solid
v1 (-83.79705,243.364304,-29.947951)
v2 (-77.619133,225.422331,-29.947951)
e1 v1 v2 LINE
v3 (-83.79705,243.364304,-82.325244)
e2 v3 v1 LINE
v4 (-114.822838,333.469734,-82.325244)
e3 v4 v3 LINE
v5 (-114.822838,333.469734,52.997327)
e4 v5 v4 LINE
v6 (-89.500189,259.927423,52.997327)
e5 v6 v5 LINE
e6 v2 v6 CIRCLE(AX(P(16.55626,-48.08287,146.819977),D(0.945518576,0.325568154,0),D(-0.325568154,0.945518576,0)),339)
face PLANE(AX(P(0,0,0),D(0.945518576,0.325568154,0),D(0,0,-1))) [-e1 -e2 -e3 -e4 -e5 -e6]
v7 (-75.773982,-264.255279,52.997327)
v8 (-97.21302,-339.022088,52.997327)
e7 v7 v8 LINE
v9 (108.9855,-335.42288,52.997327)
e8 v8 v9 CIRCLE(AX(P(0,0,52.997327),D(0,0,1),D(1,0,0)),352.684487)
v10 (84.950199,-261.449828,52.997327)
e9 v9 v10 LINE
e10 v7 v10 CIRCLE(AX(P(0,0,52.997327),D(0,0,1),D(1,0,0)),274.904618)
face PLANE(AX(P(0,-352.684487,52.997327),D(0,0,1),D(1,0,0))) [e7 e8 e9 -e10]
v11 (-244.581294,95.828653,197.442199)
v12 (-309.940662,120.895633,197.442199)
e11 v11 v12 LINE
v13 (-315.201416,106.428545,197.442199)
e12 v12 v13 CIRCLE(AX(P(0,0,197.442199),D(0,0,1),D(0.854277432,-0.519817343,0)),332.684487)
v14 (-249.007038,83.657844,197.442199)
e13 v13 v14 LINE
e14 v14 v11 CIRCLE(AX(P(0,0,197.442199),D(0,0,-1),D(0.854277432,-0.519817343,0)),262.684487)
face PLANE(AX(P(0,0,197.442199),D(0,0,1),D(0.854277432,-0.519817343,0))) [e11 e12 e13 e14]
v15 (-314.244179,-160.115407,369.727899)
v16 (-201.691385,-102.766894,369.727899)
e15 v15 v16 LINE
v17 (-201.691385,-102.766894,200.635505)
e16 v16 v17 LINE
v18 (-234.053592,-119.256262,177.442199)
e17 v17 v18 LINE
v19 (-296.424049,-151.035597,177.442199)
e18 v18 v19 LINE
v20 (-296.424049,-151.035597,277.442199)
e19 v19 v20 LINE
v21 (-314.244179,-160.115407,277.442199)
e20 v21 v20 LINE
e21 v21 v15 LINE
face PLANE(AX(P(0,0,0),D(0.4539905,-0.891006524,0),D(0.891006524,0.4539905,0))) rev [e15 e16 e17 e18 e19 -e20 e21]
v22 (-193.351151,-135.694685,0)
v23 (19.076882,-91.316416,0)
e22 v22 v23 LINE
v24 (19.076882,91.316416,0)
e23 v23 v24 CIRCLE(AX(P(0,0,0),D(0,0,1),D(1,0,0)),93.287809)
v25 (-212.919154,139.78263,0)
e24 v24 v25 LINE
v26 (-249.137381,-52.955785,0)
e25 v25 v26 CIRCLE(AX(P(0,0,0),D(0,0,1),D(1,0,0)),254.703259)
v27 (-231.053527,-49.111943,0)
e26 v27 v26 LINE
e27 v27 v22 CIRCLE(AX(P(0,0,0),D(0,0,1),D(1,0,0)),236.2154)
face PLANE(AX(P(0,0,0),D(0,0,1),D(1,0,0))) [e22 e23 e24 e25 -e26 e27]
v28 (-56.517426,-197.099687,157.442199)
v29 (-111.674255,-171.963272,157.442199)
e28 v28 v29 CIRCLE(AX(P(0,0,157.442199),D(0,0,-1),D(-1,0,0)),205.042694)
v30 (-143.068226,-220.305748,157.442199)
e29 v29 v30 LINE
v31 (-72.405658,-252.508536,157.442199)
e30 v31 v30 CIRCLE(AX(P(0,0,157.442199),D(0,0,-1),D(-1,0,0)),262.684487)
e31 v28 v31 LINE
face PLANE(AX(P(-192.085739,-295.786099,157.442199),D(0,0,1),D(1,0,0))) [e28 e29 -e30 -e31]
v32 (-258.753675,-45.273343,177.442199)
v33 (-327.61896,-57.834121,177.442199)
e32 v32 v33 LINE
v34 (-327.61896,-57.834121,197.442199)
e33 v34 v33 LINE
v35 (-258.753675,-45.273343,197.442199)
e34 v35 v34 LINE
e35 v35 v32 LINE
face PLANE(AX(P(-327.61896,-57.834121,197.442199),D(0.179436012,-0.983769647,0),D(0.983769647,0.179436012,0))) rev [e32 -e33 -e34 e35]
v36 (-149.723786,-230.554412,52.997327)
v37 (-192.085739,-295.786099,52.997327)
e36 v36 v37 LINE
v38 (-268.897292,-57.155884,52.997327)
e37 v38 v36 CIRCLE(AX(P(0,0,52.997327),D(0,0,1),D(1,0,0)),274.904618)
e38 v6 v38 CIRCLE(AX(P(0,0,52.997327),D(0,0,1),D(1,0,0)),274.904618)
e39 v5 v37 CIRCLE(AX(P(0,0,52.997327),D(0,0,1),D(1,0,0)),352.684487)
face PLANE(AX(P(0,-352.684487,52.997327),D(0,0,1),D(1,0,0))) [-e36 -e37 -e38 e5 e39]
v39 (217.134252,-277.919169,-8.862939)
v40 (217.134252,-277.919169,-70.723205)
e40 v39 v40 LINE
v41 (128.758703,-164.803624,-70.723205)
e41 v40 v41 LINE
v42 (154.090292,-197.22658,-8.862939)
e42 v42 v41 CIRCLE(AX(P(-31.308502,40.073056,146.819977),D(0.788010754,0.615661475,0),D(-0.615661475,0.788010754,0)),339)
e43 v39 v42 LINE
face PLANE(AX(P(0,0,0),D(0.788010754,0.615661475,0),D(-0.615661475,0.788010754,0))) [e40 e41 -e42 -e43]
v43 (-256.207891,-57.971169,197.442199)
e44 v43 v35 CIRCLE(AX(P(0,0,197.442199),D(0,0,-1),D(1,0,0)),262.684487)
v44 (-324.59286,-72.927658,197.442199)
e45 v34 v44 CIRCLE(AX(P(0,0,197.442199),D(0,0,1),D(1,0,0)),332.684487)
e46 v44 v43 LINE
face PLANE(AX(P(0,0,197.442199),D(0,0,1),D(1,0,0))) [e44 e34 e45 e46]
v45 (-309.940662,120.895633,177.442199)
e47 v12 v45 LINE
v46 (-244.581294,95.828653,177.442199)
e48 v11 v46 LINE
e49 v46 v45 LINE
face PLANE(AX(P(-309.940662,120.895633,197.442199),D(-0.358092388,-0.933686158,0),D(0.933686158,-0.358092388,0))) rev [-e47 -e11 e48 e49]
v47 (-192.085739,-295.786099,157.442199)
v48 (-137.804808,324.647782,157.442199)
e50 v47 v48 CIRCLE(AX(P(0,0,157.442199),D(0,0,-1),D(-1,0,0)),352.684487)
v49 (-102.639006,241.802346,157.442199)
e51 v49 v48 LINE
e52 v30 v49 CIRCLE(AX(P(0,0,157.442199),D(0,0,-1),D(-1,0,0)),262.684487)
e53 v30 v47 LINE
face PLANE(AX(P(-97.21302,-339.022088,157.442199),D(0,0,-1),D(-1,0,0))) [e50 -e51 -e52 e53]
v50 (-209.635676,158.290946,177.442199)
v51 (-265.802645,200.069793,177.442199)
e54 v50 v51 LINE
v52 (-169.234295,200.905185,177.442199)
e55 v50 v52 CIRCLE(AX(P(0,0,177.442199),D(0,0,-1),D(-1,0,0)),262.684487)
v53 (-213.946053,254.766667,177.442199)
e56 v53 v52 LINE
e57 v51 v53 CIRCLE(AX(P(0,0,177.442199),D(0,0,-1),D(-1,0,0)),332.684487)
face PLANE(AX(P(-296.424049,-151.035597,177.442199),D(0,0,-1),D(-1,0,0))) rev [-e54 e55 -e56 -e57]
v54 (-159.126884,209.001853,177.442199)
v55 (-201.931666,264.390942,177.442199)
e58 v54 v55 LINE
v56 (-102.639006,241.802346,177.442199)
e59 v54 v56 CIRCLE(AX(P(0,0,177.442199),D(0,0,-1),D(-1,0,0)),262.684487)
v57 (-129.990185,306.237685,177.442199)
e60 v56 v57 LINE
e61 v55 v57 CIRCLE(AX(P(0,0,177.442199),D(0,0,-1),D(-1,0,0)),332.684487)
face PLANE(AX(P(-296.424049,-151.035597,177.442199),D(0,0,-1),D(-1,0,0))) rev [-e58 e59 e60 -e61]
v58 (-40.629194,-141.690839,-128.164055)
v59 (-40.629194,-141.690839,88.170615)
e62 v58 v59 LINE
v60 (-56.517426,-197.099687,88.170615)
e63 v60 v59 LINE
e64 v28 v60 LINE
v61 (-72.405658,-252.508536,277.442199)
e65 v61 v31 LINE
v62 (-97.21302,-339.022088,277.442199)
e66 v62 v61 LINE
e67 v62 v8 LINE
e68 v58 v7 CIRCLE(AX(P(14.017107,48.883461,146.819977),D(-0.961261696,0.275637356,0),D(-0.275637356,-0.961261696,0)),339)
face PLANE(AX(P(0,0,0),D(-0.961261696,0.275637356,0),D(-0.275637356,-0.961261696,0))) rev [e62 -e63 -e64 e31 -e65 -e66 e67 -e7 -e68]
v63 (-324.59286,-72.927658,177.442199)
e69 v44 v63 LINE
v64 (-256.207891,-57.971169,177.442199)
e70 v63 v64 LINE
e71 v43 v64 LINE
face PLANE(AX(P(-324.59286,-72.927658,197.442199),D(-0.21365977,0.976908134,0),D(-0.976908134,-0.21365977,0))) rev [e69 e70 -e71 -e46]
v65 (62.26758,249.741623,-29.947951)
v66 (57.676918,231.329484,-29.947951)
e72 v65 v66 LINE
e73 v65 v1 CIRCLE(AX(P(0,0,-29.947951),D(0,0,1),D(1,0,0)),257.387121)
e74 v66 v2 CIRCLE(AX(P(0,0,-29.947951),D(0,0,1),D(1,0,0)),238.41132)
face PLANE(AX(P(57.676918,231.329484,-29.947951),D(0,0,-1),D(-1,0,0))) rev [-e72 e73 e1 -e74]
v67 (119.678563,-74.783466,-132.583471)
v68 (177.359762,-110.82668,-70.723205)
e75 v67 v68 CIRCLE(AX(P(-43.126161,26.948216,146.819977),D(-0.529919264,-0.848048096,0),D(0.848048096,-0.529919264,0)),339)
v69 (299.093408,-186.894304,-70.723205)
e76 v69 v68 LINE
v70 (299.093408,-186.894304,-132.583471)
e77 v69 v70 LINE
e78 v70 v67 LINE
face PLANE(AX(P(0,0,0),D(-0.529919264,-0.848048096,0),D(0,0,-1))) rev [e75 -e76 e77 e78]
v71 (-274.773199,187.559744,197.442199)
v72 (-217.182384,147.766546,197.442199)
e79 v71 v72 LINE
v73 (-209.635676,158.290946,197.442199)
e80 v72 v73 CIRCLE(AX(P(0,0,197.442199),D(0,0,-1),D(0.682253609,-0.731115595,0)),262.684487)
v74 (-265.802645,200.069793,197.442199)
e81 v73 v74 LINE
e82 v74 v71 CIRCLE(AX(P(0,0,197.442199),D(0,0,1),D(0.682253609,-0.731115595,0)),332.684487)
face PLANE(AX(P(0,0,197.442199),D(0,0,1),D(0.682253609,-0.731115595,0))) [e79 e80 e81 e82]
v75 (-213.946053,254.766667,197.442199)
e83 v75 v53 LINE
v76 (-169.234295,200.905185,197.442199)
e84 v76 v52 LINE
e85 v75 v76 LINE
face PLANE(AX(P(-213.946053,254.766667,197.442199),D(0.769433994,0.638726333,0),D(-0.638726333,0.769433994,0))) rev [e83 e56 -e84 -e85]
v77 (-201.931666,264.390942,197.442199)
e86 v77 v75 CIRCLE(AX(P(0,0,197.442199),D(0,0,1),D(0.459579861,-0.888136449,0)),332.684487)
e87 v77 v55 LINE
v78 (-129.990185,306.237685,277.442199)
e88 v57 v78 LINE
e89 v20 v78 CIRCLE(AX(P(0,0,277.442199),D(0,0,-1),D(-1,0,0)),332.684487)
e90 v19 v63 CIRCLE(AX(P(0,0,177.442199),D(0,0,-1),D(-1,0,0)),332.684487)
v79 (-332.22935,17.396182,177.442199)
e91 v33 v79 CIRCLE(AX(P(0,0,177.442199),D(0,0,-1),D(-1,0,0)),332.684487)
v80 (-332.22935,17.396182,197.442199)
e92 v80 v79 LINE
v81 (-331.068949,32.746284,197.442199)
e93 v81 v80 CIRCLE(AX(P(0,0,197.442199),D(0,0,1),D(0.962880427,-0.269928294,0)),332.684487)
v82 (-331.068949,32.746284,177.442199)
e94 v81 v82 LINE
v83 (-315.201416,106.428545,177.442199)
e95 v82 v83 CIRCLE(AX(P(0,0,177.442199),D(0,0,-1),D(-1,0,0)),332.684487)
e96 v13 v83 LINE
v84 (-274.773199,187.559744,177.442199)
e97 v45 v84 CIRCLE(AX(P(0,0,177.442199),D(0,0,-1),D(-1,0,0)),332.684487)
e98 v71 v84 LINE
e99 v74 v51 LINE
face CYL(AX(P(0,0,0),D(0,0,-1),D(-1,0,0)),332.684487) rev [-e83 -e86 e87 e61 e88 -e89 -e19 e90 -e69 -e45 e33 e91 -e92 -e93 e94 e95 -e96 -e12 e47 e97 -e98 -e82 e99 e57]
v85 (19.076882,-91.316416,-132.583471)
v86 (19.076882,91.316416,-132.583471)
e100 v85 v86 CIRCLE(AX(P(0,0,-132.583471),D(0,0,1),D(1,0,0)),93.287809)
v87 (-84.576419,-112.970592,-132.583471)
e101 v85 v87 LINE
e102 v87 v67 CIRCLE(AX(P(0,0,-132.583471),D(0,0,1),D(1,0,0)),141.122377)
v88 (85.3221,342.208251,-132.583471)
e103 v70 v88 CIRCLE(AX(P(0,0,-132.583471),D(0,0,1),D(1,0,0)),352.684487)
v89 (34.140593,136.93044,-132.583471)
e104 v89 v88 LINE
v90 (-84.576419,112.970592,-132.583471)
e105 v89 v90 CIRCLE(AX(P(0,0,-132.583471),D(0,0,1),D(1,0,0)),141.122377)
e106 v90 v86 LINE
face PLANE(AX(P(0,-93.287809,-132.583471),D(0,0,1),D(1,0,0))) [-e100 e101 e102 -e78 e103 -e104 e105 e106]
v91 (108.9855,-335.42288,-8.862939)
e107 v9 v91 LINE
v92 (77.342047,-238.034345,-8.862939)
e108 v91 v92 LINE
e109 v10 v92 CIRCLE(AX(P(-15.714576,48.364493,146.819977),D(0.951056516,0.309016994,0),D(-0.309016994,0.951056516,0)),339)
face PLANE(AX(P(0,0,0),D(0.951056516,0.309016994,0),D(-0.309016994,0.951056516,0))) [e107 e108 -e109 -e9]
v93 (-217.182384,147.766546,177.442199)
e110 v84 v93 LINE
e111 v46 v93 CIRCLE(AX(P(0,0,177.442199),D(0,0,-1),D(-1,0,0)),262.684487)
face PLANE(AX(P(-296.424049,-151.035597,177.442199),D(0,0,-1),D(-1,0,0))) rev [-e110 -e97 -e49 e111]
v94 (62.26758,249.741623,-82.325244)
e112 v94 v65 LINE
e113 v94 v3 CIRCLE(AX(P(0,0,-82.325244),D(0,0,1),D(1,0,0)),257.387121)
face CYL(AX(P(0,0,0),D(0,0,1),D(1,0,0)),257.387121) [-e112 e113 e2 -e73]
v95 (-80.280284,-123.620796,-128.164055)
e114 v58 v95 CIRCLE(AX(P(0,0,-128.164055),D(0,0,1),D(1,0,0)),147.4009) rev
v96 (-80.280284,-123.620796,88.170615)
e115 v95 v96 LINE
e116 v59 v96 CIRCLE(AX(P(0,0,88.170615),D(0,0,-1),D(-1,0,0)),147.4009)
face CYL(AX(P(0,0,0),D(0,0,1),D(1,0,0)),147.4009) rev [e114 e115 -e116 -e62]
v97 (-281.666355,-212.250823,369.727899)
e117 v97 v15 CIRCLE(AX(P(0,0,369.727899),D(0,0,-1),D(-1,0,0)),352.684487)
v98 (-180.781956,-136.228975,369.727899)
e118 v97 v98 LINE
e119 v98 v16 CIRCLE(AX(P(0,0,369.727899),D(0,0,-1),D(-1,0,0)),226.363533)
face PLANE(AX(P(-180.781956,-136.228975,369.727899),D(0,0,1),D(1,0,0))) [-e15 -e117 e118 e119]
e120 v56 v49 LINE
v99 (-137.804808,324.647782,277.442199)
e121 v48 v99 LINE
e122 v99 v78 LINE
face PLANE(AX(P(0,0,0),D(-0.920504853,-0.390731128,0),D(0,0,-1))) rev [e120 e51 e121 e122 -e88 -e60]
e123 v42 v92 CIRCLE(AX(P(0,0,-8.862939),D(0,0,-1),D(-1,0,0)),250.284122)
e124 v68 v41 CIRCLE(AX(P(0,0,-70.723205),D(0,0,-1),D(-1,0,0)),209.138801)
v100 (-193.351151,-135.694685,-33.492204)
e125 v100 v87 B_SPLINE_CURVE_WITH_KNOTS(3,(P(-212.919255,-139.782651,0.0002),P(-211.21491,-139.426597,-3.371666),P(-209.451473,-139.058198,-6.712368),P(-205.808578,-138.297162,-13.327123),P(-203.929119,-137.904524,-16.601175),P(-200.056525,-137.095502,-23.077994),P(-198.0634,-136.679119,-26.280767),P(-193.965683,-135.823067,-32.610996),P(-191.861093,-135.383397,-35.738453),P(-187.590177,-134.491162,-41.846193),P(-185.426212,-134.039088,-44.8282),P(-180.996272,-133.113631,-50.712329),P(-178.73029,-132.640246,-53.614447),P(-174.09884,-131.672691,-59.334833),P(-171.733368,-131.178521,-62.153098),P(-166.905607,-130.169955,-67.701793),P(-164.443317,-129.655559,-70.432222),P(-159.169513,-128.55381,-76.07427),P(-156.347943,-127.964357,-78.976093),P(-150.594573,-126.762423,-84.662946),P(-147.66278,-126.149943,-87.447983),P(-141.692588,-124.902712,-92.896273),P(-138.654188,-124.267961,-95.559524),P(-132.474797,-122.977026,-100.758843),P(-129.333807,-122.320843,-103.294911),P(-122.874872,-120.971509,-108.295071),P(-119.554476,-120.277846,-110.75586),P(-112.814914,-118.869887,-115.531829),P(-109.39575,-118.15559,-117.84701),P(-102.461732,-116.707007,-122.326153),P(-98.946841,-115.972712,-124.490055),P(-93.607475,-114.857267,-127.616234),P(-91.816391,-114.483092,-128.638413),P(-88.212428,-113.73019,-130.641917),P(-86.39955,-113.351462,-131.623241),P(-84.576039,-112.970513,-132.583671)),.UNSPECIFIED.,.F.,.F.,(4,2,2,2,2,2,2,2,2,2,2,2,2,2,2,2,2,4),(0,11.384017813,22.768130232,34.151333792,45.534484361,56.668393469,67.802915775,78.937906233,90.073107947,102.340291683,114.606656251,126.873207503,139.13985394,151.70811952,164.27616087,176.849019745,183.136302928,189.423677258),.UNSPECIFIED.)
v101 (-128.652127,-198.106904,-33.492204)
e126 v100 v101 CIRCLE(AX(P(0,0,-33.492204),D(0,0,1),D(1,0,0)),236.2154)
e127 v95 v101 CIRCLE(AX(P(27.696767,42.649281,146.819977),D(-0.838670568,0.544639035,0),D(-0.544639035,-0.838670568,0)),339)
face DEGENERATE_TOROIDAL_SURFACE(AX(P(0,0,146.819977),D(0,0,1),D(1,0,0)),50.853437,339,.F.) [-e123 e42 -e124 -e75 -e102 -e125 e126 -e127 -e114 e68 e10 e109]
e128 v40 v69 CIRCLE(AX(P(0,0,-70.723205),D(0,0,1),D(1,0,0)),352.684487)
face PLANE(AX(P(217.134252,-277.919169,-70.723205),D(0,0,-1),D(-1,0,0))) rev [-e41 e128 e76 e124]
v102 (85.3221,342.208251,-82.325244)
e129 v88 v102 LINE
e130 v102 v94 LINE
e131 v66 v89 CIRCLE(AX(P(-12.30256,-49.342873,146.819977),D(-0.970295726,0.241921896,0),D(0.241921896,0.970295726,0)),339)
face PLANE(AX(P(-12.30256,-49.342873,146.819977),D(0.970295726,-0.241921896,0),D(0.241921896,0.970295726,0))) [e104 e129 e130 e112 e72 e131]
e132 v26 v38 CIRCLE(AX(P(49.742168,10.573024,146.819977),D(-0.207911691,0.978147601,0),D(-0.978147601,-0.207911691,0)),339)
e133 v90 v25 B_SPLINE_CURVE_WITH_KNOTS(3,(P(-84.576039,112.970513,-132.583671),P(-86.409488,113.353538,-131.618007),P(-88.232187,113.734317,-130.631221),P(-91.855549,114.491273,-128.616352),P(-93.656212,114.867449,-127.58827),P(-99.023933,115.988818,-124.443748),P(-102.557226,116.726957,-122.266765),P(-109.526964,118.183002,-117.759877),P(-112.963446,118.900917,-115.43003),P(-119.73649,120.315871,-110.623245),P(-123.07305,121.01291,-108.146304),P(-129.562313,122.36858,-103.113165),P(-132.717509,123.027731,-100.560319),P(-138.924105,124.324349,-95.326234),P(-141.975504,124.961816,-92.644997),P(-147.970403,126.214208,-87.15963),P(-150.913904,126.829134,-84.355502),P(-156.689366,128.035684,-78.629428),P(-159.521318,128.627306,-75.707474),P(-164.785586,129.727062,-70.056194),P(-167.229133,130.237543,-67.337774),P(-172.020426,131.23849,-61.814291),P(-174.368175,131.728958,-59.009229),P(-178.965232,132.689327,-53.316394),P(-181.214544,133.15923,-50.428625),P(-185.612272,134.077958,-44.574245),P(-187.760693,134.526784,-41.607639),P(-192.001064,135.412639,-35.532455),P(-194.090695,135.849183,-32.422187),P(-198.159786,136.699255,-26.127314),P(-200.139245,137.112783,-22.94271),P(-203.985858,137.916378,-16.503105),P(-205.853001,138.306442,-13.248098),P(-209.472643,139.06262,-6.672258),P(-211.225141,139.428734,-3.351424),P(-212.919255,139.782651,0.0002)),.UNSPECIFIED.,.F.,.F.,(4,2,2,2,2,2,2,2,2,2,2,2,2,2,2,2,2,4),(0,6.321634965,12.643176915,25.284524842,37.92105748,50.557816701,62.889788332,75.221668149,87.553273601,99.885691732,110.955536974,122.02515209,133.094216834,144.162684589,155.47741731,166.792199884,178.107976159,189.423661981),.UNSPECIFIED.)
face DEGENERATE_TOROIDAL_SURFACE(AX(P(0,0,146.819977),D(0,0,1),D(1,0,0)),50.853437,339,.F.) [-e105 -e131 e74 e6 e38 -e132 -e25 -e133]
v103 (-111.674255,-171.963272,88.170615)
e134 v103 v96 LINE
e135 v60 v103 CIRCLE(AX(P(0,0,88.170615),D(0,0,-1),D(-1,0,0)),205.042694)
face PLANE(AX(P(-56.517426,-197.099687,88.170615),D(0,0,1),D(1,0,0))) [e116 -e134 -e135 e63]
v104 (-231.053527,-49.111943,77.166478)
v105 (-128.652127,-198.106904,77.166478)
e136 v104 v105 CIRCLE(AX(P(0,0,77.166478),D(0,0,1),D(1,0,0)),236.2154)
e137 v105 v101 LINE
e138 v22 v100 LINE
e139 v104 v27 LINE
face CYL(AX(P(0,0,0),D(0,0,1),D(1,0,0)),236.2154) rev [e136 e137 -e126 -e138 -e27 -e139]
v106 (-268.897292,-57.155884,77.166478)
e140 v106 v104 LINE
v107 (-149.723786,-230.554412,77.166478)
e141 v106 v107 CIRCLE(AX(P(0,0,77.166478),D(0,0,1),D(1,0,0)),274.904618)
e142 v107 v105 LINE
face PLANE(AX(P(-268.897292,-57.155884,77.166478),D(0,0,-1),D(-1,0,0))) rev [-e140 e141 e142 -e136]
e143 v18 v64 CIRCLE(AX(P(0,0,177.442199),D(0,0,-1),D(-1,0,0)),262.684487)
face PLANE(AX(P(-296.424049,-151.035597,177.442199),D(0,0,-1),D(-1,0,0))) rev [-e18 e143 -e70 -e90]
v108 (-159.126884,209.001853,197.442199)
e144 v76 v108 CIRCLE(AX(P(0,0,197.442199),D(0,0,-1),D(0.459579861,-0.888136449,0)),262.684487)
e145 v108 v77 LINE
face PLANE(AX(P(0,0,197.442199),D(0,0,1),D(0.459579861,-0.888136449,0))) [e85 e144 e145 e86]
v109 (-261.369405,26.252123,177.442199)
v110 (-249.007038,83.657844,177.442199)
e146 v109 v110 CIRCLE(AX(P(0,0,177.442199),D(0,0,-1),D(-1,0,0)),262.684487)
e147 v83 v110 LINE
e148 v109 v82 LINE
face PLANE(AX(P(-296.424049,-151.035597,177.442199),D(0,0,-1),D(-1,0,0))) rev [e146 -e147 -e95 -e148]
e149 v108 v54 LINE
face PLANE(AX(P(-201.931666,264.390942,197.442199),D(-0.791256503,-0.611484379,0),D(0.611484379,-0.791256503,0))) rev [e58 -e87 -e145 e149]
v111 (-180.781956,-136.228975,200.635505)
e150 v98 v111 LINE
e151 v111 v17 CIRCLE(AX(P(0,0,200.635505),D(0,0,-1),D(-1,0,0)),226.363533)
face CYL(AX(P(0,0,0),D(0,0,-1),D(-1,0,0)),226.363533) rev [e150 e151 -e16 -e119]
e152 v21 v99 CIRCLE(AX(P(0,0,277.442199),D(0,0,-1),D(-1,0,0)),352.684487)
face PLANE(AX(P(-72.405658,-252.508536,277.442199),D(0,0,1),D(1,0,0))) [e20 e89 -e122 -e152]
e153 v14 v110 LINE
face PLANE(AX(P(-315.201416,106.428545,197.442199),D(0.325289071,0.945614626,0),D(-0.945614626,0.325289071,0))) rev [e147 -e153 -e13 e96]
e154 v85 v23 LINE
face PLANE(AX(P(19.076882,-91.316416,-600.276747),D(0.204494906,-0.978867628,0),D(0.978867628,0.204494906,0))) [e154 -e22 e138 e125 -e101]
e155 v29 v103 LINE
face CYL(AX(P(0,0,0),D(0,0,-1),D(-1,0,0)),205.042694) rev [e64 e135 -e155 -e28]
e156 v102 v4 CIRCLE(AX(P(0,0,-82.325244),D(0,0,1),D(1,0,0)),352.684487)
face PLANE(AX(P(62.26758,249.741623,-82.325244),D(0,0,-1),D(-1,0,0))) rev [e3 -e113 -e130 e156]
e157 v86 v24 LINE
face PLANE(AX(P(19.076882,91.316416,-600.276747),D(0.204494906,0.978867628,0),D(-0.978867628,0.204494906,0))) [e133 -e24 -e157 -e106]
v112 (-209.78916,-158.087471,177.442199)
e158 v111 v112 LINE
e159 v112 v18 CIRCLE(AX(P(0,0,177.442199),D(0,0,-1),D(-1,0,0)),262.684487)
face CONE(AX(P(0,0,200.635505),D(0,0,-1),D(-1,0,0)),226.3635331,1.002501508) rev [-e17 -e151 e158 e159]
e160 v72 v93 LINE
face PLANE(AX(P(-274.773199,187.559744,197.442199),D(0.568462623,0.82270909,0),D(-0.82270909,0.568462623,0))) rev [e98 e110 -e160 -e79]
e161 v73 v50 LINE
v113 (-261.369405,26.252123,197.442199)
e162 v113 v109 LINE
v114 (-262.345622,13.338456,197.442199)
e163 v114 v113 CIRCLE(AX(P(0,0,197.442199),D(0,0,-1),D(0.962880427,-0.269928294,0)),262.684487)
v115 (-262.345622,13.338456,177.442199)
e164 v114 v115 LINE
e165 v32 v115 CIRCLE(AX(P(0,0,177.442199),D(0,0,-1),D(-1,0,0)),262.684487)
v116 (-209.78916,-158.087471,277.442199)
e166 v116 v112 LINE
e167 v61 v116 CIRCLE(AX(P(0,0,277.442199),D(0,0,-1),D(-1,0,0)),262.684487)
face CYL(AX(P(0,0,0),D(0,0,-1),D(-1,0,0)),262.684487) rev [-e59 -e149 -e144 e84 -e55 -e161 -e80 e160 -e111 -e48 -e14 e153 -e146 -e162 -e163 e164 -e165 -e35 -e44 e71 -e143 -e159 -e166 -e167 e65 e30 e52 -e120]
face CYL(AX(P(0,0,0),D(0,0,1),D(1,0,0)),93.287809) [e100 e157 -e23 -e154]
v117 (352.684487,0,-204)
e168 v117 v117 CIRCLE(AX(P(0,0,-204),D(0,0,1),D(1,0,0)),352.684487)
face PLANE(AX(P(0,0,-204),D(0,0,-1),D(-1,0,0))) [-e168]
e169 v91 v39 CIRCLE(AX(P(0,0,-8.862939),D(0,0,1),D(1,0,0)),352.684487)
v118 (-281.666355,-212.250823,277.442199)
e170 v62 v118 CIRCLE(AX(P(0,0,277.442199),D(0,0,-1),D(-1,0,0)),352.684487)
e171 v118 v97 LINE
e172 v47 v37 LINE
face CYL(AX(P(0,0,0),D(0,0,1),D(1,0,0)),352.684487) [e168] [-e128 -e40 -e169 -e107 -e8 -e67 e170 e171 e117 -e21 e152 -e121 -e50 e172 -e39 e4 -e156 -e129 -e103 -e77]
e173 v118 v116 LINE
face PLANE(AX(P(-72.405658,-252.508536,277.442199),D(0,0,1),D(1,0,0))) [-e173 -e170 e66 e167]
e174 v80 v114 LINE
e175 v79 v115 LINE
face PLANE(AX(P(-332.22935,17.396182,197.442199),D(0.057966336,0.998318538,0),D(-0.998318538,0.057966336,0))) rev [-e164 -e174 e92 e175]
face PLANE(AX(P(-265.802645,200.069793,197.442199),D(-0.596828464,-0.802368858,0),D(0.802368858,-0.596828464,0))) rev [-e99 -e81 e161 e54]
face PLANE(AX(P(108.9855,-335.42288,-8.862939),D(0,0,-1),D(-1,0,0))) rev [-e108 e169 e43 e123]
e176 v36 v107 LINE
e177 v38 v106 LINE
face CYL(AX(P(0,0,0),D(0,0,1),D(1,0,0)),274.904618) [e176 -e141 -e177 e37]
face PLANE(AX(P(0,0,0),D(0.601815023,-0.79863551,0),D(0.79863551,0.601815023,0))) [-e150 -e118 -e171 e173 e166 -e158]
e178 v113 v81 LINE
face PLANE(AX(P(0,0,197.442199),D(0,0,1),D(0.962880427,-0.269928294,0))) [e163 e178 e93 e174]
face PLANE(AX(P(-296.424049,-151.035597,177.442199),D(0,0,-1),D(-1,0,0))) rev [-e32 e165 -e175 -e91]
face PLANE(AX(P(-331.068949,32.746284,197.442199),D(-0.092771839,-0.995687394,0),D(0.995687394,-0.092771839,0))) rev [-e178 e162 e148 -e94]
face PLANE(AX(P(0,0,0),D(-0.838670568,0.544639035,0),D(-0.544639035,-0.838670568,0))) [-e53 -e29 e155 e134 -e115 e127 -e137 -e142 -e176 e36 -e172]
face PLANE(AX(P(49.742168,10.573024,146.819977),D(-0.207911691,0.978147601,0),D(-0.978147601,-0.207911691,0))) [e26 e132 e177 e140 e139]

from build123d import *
from build123d.topology import SkipClean

# Parameters (mm, degrees)
BOSS_EXTRUDE1_DEPTH          = 35
SKETCH5_W                    = 110
SKETCH5_H                    = 110
BOSS_EXTRUDE2_DEPTH          = 55
BOSS_EXTRUDE3_DEPTH          = 10
FILLET1_R                    = 20
FILLET4_R                    = 10
SKETCH12_W                   = 221.575141924
SKETCH12_H                   = 185.580798287
CUT_REVOLVE1_ANGLE           = 32
CUT_REVOLVE1_OTHER_WAY_ANGLE = 109
BOSS_EXTRUDE4_REACH          = 690.076
SKETCH15_W                   = 208.026220801
SKETCH15_H                   = 123.720532191
CUT_REVOLVE2_ANGLE           = 20
SKETCH16_W                   = 103.379457842
SKETCH16_H                   = 185.232234629
CUT_REVOLVE3_ANGLE           = 20
SKETCH17_W                   = 90
SKETCH17_H                   = 120
REVOLVE3_ANGLE               = 74
REVOLVE3_OTHER_WAY_ANGLE     = 67
SKETCH18_W                   = 70
SKETCH18_H                   = 100
CUT_REVOLVE4_ANGLE           = 94
SKETCH19_W                   = 306.456266988
SKETCH19_H                   = 205.283587683
REVOLVE4_ANGLE               = 17
SKETCH20_W                   = 69.271583649
SKETCH20_H                   = 57.641793842
REVOLVE5_ANGLE               = 10
REVOLVE6_ANGLE               = 45
REVOLVE7_ANGLE               = 33
BOSS_EXTRUDE5_DEPTH          = 20
CIRPATTERN1_COUNT            = 5
CIRPATTERN1_ANGLE            = 62.64


with BuildPart() as part:
    # Sketch4 → Boss-Extrude1 (new body)
    with BuildSketch(Plane.XY.offset(90)):
        with BuildLine():
            ThreePointArc((18, 0), (12.727922061, 12.727922061), (0, 18))
            Line((0, 18), (-40, 18))
            Line((-40, 18), (-40, 0))
            Line((-40, 0), (-5, 0))
            ThreePointArc((-5, 0), (0, 5), (5, 0))
            Line((5, 0), (18, 0))
        make_face()
        with BuildLine():
            ThreePointArc((0, -18), (12.727922061, -12.727922061), (18, 0))
            Line((18, 0), (5, 0))
            ThreePointArc((5, 0), (0, -5), (-5, 0))
            Line((-5, 0), (-40, 0))
            Line((-40, 0), (-40, -18))
            Line((-40, -18), (0, -18))
        make_face()
    extrude(amount=-BOSS_EXTRUDE1_DEPTH)

    # Sketch5 → Boss-Extrude2 (add)
    with BuildSketch(Plane(origin=(0, 0, 55), x_dir=(-1, 0, 0), z_dir=(0, 0, -1))):
        with Locations((22, 0)):
            Rectangle(SKETCH5_W, SKETCH5_H)
    extrude(amount=BOSS_EXTRUDE2_DEPTH)

    # Sketch7 → Boss-Extrude3 (add)
    with BuildSketch(Plane(origin=(0, 0, 0), x_dir=(-1, 0, 0), z_dir=(0, 0, -1))):
        Polygon((87, -65), (125, -79.925557452), (125, 79.925557452), (87, 65), (-43, 65), (-43, -65), align=None)
    extrude(amount=-BOSS_EXTRUDE3_DEPTH)

    # Fillet1
    fillet1_edges = [part.edges().sort_by_distance(p)[0] for p in [
        (-125, -79.925557452, 5),
        (-87, -65, 5),
        (43, -65, 5),
        (43, 65, 5),
        (-87, 65, 5),
        (-125, 79.925557452, 5),
    ]]
    fillet(fillet1_edges, radius=FILLET1_R)

    # Fillet4
    fillet4_edges = [part.edges().sort_by_distance(p)[0] for p in [
        (-40, -18, 72.5),
        (-40, 18, 72.5),
        (33, 0, 55),
        (-22, -55, 55),
        (-77, 0, 55),
        (-22, 55, 55),
        (33, -55, 32.5),
        (33, 55, 32.5),
        (33, 0, 10),
        (-77, -55, 32.5),
        (-77, 55, 32.5),
        (-77, 0, 10),
        (-22, 55, 10),
        (-22, -55, 10),
    ]]
    fillet(fillet4_edges, radius=FILLET4_R - 0.0001)  # a hair under: the kernel refuses the full size


with BuildPart() as body_2:
    # Sketch8 → Revolve1 (revolve)
    with BuildSketch(Plane(origin=(0, 0, 0), x_dir=(1, 0, 0), z_dir=(0, 1, 0))):
        with BuildLine():
            Line((0, -474), (0, 204))
            ThreePointArc((0, 204), (339, -135), (0, -474))
        make_face()
    revolve(axis=Axis((0, 0, 474), (0, 0, -1)))


with BuildPart() as body_3:
    # Sketch9 → Revolve2 (revolve)
    with BuildSketch(Plane(origin=(0, 0, 0), x_dir=(0, 0, -1), z_dir=(1, 0, 0)), mode=Mode.PRIVATE) as revolve2_sk:
        with BuildLine():
            Line((0, 0), (0, -93.287808854))
            Line((0, -93.287808854), (132.583470884, -93.287808854))
            Line((132.583470884, -93.287808854), (132.583470884, -141.122377334))
            ThreePointArc((132.583470884, -141.122377334), (51.419403359, -224.141377396), (-52.997327403, -274.904617695))
            Line((-52.997327403, -274.904617695), (-52.997327403, -352.684487381))
            Line((-52.997327403, -352.684487381), (204, -352.684487381))
            Line((204, -352.684487381), (204, 0))
            Line((204, 0), (0, 0))
        make_face()
    revolve(revolve2_sk.sketch.rotate(Axis((0, 0, 0), (0, 0, -1)), 270), axis=Axis((0, 0, 0), (0, 0, -1)))

    # Sketch12 → Cut-Revolve1 (revolve, cut)
    with BuildSketch(Plane(origin=(0, 0, 0), x_dir=(1, 0, 0), z_dir=(0, 1, 0))):
        with Locations((241.896916419, 39.793071741)):
            Rectangle(SKETCH12_W, SKETCH12_H)
    revolve(axis=Axis((0, 0, 0), (0, 0, -1)), revolution_arc=CUT_REVOLVE1_ANGLE, mode=Mode.SUBTRACT)

    # Sketch12 → Cut-Revolve1 other way (revolve, cut)
    with BuildSketch(Plane(origin=(0, 0, 0), x_dir=(1, 0, 0), z_dir=(0, 1, 0))):
        with Locations((241.896916419, 39.793071741)):
            Rectangle(SKETCH12_W, SKETCH12_H)
    revolve(axis=Axis((0, 0, 0), (0, 0, 1)), revolution_arc=CUT_REVOLVE1_OTHER_WAY_ANGLE, mode=Mode.SUBTRACT)

    # Sketch14 → Boss-Extrude4 (add, up to next)
    with BuildSketch(Plane.XY, mode=Mode.PRIVATE) as boss_extrude4_sk1:
        with BuildLine():
            Line((19.076881684, -91.316416191), (-234.050666272, -144.197206796))
            ThreePointArc((-234.050666272, -144.197206796), (-274.904617695, 0), (-234.050666272, 144.197206796))
            Line((-234.050666272, 144.197206796), (19.076881684, 91.316416191))
            ThreePointArc((19.076881684, 91.316416191), (93.287808854, 0), (19.076881684, -91.316416191))
        make_face()
    boss_extrude4_tool1 = extrude(boss_extrude4_sk1.sketch, amount=-BOSS_EXTRUDE4_REACH, mode=Mode.PRIVATE) - body_3.part
    add(boss_extrude4_tool1.solids().sort_by_distance((-108.886341, 0, 0))[0])

    # Sketch15 → Cut-Revolve2 (revolve, cut)
    with BuildSketch(Plane(origin=(0, 0, 0), x_dir=(0.8480480961564173, -0.5299192642332188, 0), z_dir=(0.5299192642332188, 0.8480480961564173, 0))):
        with Locations((248.67137698, 8.862938693)):
            Rectangle(SKETCH15_W, SKETCH15_H)
    revolve(axis=Axis((0, 0, 0), (0, 0, -1)), revolution_arc=CUT_REVOLVE2_ANGLE, mode=Mode.SUBTRACT)

    # Sketch16 → Cut-Revolve3 (revolve, cut)
    with BuildSketch(Plane(origin=(0, 0, 0), x_dir=(0, 0, -1), z_dir=(0.7880107536067323, 0.6156614753256451, 0))):
        with Locations((-42.826790228, -260.068370066)):
            Rectangle(SKETCH16_W, SKETCH16_H)
    revolve(axis=Axis((0, 0, 0), (0, 0, -1)), revolution_arc=CUT_REVOLVE3_ANGLE, mode=Mode.SUBTRACT)



with BuildPart() as body_4:
    # Sketch17 → Revolve3 (revolve)
    with BuildSketch(Plane(origin=(0, 0, 0), x_dir=(1, 0, 0), z_dir=(0, 1, 0))):
        with Locations((-307.684487381, -217.442198662)):
            Rectangle(SKETCH17_W, SKETCH17_H)
    revolve(axis=Axis((0, 0, 0), (0, 0, 1)), revolution_arc=REVOLVE3_ANGLE)

    # Sketch17 → Revolve3 other way (revolve)
    with BuildSketch(Plane(origin=(0, 0, 0), x_dir=(1, 0, 0), z_dir=(0, 1, 0))):
        with Locations((-307.684487381, -217.442198662)):
            Rectangle(SKETCH17_W, SKETCH17_H)
    revolve(axis=Axis((0, 0, 0), (0, 0, -1)), revolution_arc=REVOLVE3_OTHER_WAY_ANGLE)

    # Sketch18 → Cut-Revolve4 (revolve, cut)
    with BuildSketch(Plane(origin=(0, 0, 0), x_dir=(0.3907311284892735, -0.9205048534524405, 0), z_dir=(0.9205048534524405, 0.3907311284892735, 0))):
        with Locations((-297.684487381, -227.442198662)):
            Rectangle(SKETCH18_W, SKETCH18_H)
    revolve(axis=Axis((0, 0, 0), (0, 0, 1)), revolution_arc=CUT_REVOLVE4_ANGLE, mode=Mode.SUBTRACT)


with BuildPart() as body_3_1:
    with SkipClean():  # the faces are left unmerged after this step: merging them gives an invalid solid
        add(body_3.part)

        add(body_4.part)  # Revolve4 merges body 4
        # Sketch19 → Revolve4 (revolve)
        with BuildSketch(Plane(origin=(0, 0, 0), x_dir=(0, 0, -1), z_dir=(0.9612616959383228, -0.2756373558169854, 0))):
            with Locations((-4.214065168, -250.04269354)):
                Rectangle(SKETCH19_W, SKETCH19_H)
        revolve(axis=Axis((0, 0, 0), (0, 0, -1)), revolution_arc=REVOLVE4_ANGLE)

    # Sketch20 → Cut-Revolve5 (revolve, cut)
    with SkipClean():  # the faces are left unmerged after this step: merging them gives an invalid solid
        with BuildSketch(Plane(origin=(0, 0, 0), x_dir=(0, 0, -1), z_dir=(0.9612616959383229, -0.27563735581698545, 0)), mode=Mode.PRIVATE) as cut_revolve5_sk:
            with Locations((-122.806406838, -176.221796619)):
                Rectangle(SKETCH20_W, SKETCH20_H)
        revolve(cut_revolve5_sk.sketch.rotate(Axis((0, 0, 0), (0, 0, 1)), 286), axis=Axis((0, 0, 0), (0, 0, 1)), mode=Mode.SUBTRACT)

    # Sketch21 → Revolve5 (revolve)
    with SkipClean():  # the faces are left unmerged after this step: merging them gives an invalid solid
        with BuildSketch(Plane(origin=(0, 0, 0), x_dir=(0.8910065241883608, 0.4539904997395606, 0), z_dir=(-0.4539904997395606, 0.8910065241883608, 0))):
            Polygon((-352.684487381, -177.442198662), (-262.684487381, -177.442198662), (-226.3635331, -200.635504694), (-226.3635331, -369.727899201), (-352.684487381, -369.727899201), align=None)
        revolve(axis=Axis((0, 0, 0), (0, 0, 1)), revolution_arc=REVOLVE5_ANGLE)

    # Sketch23 → Revolve6 (revolve)
    with SkipClean():  # the faces are left unmerged after this step: merging them gives an invalid solid
        with BuildSketch(Plane(origin=(0, 0, 0), x_dir=(0, 0, 1), z_dir=(-0.838670567945428, 0.5446390350150208, 0))):
            with BuildLine():
                Line((52.997327403, -274.904617695), (77.16647828, -274.904617695))
                Line((77.16647828, -274.904617695), (77.16647828, -236.215399807))
                Line((77.16647828, -236.215399807), (-33.492204466, -236.215399807))
                ThreePointArc((-33.492204466, -236.215399807), (8.394219656, -258.596574335), (52.997327403, -274.904617695))
            make_face()
        revolve(axis=Axis((0, 0, 0), (0, 0, -1)), revolution_arc=REVOLVE6_ANGLE)

    # Sketch24 → Revolve7 (revolve)
    with SkipClean():  # the faces are left unmerged after this step: merging them gives an invalid solid
        with BuildSketch(Plane(origin=(0, 0, 0), x_dir=(0, 0, -1), z_dir=(0.9455185755993164, 0.3255681544571581, 0))):
            with BuildLine():
                Line((29.947951331, 238.411319514), (29.947951331, 257.387120756))
                Line((29.947951331, 257.387120756), (82.325244386, 257.387120756))
                Line((82.325244386, 257.387120756), (82.325244386, 352.684487381))
                Line((82.325244386, 352.684487381), (132.583470884, 352.684487381))
                Line((132.583470884, 352.684487381), (132.583470884, 141.122377334))
                ThreePointArc((132.583470884, 141.122377334), (86.395300565, 195.178337821), (29.947951331, 238.411319514))
            make_face()
        revolve(axis=Axis((0, 0, 0), (0, 0, -1)), revolution_arc=REVOLVE7_ANGLE)

    # Sketch25 → Boss-Extrude5 (add)
    with SkipClean():  # the faces are left unmerged after this step: merging them gives an invalid solid
        with BuildSketch(Plane.XY.offset(177.442198662)):
            with BuildLine():
                Line((-324.592860019, -72.927658462), (-256.207891235, -57.971168522))
                ThreePointArc((-256.207891235, -57.971168522), (-257.559046392, -51.637946631), (-258.753675036, -45.273342779))
                Line((-258.753675036, -45.273342779), (-327.618959516, -57.834120637))
                ThreePointArc((-327.618959516, -57.834120637), (-326.193222042, -65.398394765), (-324.592860019, -72.927658462))
            make_face()
        boss_extrude5 = extrude(amount=BOSS_EXTRUDE5_DEPTH)

    # CirPattern1: Boss-Extrude5 ×5 about axis
    cirpattern1_axis = Axis((0, 0, 0), (0, 0, -1))
    for i in range(1, CIRPATTERN1_COUNT):
        add(boss_extrude5.rotate(cirpattern1_axis, i * CIRPATTERN1_ANGLE / (CIRPATTERN1_COUNT - 1)))


solid = body_3_1.part
